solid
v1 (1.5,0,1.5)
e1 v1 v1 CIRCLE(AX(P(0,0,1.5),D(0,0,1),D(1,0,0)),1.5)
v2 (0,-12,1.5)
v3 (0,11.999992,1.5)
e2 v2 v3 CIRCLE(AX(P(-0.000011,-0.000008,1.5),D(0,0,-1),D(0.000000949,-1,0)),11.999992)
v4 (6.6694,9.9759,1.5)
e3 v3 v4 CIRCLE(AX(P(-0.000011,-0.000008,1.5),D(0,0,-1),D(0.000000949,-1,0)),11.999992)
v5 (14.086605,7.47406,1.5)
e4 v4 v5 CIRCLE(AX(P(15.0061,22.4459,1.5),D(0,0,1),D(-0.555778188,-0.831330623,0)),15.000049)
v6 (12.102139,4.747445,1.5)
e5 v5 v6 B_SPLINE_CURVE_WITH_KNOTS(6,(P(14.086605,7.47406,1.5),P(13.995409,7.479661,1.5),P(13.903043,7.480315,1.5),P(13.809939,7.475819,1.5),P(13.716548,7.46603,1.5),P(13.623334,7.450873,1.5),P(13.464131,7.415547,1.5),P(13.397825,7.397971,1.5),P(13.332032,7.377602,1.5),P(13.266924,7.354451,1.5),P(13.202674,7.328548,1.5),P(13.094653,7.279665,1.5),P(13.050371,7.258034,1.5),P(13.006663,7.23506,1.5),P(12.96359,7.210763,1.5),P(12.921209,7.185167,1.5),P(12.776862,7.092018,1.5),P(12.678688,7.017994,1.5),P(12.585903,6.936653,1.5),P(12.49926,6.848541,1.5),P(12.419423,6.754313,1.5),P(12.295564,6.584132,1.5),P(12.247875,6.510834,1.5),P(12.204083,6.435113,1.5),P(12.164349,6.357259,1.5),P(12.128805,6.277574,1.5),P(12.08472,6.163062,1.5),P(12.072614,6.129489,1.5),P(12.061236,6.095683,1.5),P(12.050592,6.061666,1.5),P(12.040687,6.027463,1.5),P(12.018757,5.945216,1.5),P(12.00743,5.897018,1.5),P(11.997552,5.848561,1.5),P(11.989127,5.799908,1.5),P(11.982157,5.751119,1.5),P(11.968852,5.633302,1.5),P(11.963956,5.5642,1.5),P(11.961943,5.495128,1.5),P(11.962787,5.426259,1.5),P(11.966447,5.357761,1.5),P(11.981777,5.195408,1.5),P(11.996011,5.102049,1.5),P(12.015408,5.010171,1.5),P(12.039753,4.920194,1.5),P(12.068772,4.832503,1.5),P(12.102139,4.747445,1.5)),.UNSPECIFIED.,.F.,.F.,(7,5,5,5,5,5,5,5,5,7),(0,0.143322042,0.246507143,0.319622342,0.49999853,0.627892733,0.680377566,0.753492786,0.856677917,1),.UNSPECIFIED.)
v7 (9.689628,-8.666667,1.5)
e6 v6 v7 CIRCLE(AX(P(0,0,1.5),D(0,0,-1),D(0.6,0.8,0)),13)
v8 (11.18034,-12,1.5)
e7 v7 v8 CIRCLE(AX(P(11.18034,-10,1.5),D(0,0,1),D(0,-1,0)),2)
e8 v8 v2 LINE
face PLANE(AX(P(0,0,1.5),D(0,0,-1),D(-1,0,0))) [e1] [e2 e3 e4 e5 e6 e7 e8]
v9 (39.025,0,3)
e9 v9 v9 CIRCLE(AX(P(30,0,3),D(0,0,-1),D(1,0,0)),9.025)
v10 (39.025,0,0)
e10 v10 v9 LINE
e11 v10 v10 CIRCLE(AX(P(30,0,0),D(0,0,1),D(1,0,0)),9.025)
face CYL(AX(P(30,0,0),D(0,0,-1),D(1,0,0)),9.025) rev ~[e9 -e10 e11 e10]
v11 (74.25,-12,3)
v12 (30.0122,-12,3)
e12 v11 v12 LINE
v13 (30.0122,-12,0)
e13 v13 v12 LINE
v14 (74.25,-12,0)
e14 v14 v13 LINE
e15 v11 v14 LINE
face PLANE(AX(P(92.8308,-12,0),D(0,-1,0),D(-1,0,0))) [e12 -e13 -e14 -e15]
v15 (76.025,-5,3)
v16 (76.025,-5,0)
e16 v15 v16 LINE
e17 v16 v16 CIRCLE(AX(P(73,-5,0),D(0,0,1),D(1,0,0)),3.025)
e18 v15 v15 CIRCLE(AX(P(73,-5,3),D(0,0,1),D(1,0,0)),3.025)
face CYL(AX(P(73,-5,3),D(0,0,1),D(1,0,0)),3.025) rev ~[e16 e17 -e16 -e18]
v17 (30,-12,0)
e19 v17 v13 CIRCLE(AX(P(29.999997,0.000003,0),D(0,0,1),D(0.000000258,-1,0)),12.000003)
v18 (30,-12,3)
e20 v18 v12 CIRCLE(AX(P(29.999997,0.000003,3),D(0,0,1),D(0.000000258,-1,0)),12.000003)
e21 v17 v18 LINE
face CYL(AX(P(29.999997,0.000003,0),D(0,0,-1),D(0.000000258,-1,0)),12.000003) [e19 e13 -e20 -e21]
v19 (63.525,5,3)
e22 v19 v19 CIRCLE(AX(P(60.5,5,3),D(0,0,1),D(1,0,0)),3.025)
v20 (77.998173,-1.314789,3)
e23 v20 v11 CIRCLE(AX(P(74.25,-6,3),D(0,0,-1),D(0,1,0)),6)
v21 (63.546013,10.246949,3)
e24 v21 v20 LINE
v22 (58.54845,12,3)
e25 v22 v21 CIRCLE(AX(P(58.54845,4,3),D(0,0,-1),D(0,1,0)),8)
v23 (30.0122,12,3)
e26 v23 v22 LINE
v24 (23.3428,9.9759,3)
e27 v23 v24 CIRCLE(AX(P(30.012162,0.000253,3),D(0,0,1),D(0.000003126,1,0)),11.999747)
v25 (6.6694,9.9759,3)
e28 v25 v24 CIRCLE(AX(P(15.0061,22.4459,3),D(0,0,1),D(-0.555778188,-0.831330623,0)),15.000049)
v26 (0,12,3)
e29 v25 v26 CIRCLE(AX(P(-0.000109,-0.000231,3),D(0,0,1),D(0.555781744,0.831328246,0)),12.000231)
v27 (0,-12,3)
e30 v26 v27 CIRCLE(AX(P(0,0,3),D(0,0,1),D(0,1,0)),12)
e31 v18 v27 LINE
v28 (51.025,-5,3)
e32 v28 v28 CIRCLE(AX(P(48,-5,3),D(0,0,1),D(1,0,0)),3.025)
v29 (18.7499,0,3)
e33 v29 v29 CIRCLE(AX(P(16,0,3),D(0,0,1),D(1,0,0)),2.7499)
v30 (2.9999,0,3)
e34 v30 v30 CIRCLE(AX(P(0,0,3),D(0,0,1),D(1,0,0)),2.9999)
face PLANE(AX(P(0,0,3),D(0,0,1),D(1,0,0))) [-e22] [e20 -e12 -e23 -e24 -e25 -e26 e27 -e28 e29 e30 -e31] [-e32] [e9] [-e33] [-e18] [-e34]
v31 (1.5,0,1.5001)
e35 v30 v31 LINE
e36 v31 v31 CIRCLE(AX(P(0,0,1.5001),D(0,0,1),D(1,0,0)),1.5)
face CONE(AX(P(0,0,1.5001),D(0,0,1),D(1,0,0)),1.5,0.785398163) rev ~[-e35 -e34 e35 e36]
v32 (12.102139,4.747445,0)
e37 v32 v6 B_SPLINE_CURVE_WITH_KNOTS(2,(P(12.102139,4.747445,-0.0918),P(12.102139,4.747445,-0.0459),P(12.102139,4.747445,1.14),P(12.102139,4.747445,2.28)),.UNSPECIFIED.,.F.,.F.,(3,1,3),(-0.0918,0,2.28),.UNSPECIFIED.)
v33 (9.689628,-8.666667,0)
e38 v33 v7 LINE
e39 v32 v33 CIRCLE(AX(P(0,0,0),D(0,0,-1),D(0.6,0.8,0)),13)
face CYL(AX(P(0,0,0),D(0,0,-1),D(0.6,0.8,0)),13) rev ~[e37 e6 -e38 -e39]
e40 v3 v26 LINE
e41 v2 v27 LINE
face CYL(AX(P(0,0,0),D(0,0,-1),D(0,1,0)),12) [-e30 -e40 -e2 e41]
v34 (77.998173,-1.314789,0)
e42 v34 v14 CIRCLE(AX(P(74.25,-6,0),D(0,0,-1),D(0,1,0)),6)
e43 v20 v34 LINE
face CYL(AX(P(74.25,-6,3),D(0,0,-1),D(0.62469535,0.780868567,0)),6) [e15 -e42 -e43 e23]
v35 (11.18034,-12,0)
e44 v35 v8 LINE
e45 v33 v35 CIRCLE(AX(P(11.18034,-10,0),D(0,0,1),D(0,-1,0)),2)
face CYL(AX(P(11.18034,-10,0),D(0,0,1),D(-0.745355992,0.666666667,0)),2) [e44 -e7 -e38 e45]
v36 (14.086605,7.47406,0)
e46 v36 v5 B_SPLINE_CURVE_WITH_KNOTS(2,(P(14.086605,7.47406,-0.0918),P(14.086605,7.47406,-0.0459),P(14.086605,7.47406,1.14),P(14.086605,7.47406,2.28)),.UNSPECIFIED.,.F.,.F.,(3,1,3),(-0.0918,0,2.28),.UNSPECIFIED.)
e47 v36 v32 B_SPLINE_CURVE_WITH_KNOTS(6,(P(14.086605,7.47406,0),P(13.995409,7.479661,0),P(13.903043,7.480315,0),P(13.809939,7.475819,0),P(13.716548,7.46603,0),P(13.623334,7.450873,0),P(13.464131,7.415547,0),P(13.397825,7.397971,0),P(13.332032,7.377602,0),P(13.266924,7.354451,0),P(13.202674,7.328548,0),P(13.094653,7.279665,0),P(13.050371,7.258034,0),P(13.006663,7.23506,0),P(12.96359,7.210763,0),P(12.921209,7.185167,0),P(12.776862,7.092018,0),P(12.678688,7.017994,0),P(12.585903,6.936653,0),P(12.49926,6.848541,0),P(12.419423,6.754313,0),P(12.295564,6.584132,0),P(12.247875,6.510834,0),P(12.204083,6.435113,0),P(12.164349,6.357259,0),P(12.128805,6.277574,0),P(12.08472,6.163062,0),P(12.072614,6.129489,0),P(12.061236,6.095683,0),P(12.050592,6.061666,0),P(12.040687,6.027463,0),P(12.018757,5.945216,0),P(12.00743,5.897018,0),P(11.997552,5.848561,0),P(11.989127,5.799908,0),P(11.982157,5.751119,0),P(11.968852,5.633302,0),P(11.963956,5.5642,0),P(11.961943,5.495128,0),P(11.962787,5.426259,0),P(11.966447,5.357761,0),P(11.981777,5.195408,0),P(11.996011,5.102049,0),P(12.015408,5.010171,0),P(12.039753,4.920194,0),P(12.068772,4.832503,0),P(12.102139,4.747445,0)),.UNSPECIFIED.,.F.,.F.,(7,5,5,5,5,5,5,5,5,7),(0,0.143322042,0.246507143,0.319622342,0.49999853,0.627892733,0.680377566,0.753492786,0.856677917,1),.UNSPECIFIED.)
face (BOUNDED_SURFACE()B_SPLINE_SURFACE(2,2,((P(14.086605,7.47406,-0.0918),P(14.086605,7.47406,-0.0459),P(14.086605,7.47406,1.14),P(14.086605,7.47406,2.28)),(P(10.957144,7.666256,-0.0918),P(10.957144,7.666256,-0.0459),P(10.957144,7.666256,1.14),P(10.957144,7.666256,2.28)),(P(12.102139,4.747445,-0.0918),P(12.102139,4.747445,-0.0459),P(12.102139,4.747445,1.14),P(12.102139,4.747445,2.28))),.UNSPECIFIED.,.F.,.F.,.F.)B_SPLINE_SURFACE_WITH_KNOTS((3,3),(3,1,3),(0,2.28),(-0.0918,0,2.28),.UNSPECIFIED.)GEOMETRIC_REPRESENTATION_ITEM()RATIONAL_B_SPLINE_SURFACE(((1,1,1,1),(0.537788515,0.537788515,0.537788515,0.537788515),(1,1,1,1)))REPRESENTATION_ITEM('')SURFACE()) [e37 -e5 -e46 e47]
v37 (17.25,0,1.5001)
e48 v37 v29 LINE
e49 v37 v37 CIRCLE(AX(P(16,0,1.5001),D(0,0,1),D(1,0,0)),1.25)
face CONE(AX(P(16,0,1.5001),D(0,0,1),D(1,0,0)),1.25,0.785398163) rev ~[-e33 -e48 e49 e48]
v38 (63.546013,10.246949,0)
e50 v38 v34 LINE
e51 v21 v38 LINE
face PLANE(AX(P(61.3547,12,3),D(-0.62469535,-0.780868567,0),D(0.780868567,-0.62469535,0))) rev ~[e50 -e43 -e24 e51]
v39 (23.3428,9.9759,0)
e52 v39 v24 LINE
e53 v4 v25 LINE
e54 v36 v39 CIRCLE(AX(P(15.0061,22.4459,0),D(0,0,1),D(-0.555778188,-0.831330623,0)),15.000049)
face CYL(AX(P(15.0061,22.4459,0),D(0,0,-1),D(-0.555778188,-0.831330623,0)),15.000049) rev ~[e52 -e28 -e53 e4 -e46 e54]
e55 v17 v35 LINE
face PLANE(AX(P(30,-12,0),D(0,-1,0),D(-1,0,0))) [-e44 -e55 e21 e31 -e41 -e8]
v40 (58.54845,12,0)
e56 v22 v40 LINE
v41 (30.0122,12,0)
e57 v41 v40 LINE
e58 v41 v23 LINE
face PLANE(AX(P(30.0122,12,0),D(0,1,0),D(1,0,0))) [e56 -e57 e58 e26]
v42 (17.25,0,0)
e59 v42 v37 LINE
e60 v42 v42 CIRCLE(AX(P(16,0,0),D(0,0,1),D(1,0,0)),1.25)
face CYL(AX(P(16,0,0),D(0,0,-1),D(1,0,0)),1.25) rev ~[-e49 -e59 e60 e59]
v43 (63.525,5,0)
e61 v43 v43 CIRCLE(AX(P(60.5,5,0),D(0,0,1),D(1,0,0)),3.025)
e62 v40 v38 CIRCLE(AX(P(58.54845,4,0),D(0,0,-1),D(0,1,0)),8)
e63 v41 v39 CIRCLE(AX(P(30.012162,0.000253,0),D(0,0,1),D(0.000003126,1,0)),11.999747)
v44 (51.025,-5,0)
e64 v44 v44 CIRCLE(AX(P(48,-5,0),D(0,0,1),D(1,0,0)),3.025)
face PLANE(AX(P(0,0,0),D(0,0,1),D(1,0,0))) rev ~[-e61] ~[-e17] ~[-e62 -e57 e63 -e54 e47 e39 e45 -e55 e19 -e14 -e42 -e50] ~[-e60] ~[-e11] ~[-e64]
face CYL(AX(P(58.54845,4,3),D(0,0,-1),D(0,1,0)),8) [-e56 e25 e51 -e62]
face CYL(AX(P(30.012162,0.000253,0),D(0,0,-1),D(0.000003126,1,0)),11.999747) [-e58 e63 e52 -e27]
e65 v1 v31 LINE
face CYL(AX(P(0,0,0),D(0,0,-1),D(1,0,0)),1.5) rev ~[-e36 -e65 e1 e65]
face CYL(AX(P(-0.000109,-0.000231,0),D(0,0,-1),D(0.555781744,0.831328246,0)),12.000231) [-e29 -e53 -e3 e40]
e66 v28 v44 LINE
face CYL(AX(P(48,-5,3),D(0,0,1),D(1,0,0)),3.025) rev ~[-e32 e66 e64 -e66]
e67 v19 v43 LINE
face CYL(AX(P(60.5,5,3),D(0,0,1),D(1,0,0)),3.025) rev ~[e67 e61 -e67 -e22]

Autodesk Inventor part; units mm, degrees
ref_plane "YZ Plane" through (0, 0, 0) normal (1, 0, 0) x (0, 1, 0)
ref_plane "XZ Plane" through (0, 0, 0) normal (0, 1, 0) x (-1, 0, 0)
ref_plane "XY Plane" through (0, 0, 0) normal (0, 0, 1) x (1, 0, 0)
sketch "スケッチ1" plane through (0, 0, 0) normal (0, 0, 1) x (1, 0, 0)
  line L0 (0, 0) -> (30, 0) construction
  line L1 (0, 12) -> (30.0122, 12)
  line L2 (30, -12) -> (0, -12)
  arc A0 (0, 12) -> (0, -12) centre (0, 0) ccw
  arc A1 (30, -12) -> (30.0122, 12) centre (30, 0) ccw
  circle A2 centre (0, 0) radius 1.5
  circle A3 centre (30, 0) radius 9.025
  arc A4 (6.6694, 9.9759) -> (23.3428, 9.9759) centre (15.0061, 22.4459) ccw
  arc A5 (30.0122, 12) -> (30, -12) centre (30.0122, 0) ccw construction
  arc A6 (0, -12) -> (0, 12) centre (0, 0) ccw construction
  arc A7 (6.6694, 9.9759) -> (0, 12) centre (0, 0) ccw
  arc A8 (30.0122, 12) -> (23.3428, 9.9759) centre (30.0122, 0) ccw
  line L3 (30.0122, 12) -> (92.8308, 12)
  line L4 (92.8308, 12) -> (92.8308, -12)
  line L5 (92.8308, -12) -> (30.0122, -12)
  line L6 (30.0122, -12) -> (30.0122, 12)
  circle A9 centre (16, 0) radius 1.25
  point P0 (30.0122, -12)
  dimension "d0" = 30
  dimension "d1" = 12
  dimension "d2" = 3
  dimension "d3" = 18.05
  dimension "d6" = 15
  dimension "d11" = 2.5
  dimension "d12" = 16
extrude "押し出し1" add sketch "スケッチ1" along normal blind 3 contours A7 A4 A8 L6 A3 A1 L2 A0 | L3 L4 L5 A1 | A1 L6 A3
sketch "スケッチ2" plane through (0, 0, 0) normal (0, 0, -1) x (-1, 0, 0)
  arc A0 (-30.0122, -12) -> (-30, -12) centre (-30, 0) ccw projected
  line L0 (-92.8308, 12) -> (-30.0122, 12) projected
  line L1 (-92.8308, -12) -> (-92.8308, 12) projected
  line L2 (0, -12) -> (-30, -12) projected
  arc A1 (0, -12) -> (-6.6694, 9.9759) centre (0, 0) ccw projected
  arc A2 (-23.3428, 9.9759) -> (-6.6694, 9.9759) centre (-15.0061, 22.4459) ccw projected
  circle A3 centre (0, 0) radius 1.5 projected
  circle A4 centre (-30, 0) radius 9.025 projected
  arc A5 (-23.3428, 9.9759) -> (-6.6694, 9.9759) centre (-15.0061, 22.4459) ccw projected
  arc A6 (-6.6694, 9.9759) -> (0, -12) centre (0, 0) ccw
  arc A7 (-7.8, 10.4) -> (0, -13) centre (0, 0) ccw
  line L3 (-30.0122, -12) -> (-92.8308, -12) projected
  arc A8 (-23.3428, 9.9759) -> (-30.0122, 12) centre (-30.0122, 0) ccw projected
  point P0 (-9.9986, 8.3083)
  point P1 (-5, -12)
  point P2 (-10.0009, 8.3056)
  dimension "d7" = 1
extrude "押し出し2" cut sketch "スケッチ2" against normal blind 1.5 contours A7 A2 A6 L2 | A6 A1
fillet "フィレット1" radius 2 2 edges at (10.0009, 8.3056, 0.75) (5, -12, 0.75)
sketch "スケッチ3" plane through (0, 0, 3) normal (0, 0, 1) x (1, 0, 0)
  line L0 (92.8308, 12) -> (30.0122, 12) projected
  arc A0 (30.0122, 12) -> (23.3428, 9.9759) centre (30.0122, 0) ccw projected
  arc A1 (6.6694, 9.9759) -> (23.3428, 9.9759) centre (15.0061, 22.4459) ccw projected
  arc A2 (6.6694, 9.9759) -> (0, -12) centre (0, 0) ccw projected
  line L1 (0, -12) -> (30, -12) projected
  arc A3 (30, -12) -> (30.0122, -12) centre (30, 0) ccw projected
  line L2 (30.0122, -12) -> (92.8308, -12) projected
  line L3 (92.8308, -12) -> (92.8308, 12) projected
  circle A4 centre (30, 0) radius 9.025 projected
  circle A5 centre (0, 0) radius 1.5 projected
  circle A6 centre (16, 0) radius 1.25 projected
  circle A7 centre (48, -5) radius 3.025
  circle A8 centre (73, -5) radius 3.025
  circle A9 centre (60.5, 5) radius 3.025
  line L4 (48, -5) -> (73, -5) construction
  line L5 (92.8308, 12) -> (30.0122, 12) projected
  line L6 (61.3547, 12) -> (92.8308, -13.1809)
  line L7 (92.8308, -12) -> (92.8308, 12) projected
  line L8 (60.5, 5) -> (73, -5) construction
  line L9 (60.5, 5) -> (60.5, -5) construction
  point P0 (60.5, 0)
  point P1 (91.3547, -12)
  dimension "d13" = 6.05
  dimension "d14" = 6.05
  dimension "d15" = 6.05
  dimension "d16" = 25
  dimension "d17" = 10
  dimension "d18" = 18
  dimension "d19" = 6
extrude "押し出し3" cut sketch "スケッチ3" against normal blind 10 contours L3 L2 L6 L0 | A7 | A8 | A9
fillet "フィレット2" radius 8 1 edges at (61.3547, 12, 1.5)
fillet "フィレット3" radius 6 1 edges at (91.3547, -12, 1.5)
chamfer "面取り1" distance 1.5 angle 45 2 edges at (-1.5, 0, 3) (14.75, 0, 3)
properties part number "揺動節左"
